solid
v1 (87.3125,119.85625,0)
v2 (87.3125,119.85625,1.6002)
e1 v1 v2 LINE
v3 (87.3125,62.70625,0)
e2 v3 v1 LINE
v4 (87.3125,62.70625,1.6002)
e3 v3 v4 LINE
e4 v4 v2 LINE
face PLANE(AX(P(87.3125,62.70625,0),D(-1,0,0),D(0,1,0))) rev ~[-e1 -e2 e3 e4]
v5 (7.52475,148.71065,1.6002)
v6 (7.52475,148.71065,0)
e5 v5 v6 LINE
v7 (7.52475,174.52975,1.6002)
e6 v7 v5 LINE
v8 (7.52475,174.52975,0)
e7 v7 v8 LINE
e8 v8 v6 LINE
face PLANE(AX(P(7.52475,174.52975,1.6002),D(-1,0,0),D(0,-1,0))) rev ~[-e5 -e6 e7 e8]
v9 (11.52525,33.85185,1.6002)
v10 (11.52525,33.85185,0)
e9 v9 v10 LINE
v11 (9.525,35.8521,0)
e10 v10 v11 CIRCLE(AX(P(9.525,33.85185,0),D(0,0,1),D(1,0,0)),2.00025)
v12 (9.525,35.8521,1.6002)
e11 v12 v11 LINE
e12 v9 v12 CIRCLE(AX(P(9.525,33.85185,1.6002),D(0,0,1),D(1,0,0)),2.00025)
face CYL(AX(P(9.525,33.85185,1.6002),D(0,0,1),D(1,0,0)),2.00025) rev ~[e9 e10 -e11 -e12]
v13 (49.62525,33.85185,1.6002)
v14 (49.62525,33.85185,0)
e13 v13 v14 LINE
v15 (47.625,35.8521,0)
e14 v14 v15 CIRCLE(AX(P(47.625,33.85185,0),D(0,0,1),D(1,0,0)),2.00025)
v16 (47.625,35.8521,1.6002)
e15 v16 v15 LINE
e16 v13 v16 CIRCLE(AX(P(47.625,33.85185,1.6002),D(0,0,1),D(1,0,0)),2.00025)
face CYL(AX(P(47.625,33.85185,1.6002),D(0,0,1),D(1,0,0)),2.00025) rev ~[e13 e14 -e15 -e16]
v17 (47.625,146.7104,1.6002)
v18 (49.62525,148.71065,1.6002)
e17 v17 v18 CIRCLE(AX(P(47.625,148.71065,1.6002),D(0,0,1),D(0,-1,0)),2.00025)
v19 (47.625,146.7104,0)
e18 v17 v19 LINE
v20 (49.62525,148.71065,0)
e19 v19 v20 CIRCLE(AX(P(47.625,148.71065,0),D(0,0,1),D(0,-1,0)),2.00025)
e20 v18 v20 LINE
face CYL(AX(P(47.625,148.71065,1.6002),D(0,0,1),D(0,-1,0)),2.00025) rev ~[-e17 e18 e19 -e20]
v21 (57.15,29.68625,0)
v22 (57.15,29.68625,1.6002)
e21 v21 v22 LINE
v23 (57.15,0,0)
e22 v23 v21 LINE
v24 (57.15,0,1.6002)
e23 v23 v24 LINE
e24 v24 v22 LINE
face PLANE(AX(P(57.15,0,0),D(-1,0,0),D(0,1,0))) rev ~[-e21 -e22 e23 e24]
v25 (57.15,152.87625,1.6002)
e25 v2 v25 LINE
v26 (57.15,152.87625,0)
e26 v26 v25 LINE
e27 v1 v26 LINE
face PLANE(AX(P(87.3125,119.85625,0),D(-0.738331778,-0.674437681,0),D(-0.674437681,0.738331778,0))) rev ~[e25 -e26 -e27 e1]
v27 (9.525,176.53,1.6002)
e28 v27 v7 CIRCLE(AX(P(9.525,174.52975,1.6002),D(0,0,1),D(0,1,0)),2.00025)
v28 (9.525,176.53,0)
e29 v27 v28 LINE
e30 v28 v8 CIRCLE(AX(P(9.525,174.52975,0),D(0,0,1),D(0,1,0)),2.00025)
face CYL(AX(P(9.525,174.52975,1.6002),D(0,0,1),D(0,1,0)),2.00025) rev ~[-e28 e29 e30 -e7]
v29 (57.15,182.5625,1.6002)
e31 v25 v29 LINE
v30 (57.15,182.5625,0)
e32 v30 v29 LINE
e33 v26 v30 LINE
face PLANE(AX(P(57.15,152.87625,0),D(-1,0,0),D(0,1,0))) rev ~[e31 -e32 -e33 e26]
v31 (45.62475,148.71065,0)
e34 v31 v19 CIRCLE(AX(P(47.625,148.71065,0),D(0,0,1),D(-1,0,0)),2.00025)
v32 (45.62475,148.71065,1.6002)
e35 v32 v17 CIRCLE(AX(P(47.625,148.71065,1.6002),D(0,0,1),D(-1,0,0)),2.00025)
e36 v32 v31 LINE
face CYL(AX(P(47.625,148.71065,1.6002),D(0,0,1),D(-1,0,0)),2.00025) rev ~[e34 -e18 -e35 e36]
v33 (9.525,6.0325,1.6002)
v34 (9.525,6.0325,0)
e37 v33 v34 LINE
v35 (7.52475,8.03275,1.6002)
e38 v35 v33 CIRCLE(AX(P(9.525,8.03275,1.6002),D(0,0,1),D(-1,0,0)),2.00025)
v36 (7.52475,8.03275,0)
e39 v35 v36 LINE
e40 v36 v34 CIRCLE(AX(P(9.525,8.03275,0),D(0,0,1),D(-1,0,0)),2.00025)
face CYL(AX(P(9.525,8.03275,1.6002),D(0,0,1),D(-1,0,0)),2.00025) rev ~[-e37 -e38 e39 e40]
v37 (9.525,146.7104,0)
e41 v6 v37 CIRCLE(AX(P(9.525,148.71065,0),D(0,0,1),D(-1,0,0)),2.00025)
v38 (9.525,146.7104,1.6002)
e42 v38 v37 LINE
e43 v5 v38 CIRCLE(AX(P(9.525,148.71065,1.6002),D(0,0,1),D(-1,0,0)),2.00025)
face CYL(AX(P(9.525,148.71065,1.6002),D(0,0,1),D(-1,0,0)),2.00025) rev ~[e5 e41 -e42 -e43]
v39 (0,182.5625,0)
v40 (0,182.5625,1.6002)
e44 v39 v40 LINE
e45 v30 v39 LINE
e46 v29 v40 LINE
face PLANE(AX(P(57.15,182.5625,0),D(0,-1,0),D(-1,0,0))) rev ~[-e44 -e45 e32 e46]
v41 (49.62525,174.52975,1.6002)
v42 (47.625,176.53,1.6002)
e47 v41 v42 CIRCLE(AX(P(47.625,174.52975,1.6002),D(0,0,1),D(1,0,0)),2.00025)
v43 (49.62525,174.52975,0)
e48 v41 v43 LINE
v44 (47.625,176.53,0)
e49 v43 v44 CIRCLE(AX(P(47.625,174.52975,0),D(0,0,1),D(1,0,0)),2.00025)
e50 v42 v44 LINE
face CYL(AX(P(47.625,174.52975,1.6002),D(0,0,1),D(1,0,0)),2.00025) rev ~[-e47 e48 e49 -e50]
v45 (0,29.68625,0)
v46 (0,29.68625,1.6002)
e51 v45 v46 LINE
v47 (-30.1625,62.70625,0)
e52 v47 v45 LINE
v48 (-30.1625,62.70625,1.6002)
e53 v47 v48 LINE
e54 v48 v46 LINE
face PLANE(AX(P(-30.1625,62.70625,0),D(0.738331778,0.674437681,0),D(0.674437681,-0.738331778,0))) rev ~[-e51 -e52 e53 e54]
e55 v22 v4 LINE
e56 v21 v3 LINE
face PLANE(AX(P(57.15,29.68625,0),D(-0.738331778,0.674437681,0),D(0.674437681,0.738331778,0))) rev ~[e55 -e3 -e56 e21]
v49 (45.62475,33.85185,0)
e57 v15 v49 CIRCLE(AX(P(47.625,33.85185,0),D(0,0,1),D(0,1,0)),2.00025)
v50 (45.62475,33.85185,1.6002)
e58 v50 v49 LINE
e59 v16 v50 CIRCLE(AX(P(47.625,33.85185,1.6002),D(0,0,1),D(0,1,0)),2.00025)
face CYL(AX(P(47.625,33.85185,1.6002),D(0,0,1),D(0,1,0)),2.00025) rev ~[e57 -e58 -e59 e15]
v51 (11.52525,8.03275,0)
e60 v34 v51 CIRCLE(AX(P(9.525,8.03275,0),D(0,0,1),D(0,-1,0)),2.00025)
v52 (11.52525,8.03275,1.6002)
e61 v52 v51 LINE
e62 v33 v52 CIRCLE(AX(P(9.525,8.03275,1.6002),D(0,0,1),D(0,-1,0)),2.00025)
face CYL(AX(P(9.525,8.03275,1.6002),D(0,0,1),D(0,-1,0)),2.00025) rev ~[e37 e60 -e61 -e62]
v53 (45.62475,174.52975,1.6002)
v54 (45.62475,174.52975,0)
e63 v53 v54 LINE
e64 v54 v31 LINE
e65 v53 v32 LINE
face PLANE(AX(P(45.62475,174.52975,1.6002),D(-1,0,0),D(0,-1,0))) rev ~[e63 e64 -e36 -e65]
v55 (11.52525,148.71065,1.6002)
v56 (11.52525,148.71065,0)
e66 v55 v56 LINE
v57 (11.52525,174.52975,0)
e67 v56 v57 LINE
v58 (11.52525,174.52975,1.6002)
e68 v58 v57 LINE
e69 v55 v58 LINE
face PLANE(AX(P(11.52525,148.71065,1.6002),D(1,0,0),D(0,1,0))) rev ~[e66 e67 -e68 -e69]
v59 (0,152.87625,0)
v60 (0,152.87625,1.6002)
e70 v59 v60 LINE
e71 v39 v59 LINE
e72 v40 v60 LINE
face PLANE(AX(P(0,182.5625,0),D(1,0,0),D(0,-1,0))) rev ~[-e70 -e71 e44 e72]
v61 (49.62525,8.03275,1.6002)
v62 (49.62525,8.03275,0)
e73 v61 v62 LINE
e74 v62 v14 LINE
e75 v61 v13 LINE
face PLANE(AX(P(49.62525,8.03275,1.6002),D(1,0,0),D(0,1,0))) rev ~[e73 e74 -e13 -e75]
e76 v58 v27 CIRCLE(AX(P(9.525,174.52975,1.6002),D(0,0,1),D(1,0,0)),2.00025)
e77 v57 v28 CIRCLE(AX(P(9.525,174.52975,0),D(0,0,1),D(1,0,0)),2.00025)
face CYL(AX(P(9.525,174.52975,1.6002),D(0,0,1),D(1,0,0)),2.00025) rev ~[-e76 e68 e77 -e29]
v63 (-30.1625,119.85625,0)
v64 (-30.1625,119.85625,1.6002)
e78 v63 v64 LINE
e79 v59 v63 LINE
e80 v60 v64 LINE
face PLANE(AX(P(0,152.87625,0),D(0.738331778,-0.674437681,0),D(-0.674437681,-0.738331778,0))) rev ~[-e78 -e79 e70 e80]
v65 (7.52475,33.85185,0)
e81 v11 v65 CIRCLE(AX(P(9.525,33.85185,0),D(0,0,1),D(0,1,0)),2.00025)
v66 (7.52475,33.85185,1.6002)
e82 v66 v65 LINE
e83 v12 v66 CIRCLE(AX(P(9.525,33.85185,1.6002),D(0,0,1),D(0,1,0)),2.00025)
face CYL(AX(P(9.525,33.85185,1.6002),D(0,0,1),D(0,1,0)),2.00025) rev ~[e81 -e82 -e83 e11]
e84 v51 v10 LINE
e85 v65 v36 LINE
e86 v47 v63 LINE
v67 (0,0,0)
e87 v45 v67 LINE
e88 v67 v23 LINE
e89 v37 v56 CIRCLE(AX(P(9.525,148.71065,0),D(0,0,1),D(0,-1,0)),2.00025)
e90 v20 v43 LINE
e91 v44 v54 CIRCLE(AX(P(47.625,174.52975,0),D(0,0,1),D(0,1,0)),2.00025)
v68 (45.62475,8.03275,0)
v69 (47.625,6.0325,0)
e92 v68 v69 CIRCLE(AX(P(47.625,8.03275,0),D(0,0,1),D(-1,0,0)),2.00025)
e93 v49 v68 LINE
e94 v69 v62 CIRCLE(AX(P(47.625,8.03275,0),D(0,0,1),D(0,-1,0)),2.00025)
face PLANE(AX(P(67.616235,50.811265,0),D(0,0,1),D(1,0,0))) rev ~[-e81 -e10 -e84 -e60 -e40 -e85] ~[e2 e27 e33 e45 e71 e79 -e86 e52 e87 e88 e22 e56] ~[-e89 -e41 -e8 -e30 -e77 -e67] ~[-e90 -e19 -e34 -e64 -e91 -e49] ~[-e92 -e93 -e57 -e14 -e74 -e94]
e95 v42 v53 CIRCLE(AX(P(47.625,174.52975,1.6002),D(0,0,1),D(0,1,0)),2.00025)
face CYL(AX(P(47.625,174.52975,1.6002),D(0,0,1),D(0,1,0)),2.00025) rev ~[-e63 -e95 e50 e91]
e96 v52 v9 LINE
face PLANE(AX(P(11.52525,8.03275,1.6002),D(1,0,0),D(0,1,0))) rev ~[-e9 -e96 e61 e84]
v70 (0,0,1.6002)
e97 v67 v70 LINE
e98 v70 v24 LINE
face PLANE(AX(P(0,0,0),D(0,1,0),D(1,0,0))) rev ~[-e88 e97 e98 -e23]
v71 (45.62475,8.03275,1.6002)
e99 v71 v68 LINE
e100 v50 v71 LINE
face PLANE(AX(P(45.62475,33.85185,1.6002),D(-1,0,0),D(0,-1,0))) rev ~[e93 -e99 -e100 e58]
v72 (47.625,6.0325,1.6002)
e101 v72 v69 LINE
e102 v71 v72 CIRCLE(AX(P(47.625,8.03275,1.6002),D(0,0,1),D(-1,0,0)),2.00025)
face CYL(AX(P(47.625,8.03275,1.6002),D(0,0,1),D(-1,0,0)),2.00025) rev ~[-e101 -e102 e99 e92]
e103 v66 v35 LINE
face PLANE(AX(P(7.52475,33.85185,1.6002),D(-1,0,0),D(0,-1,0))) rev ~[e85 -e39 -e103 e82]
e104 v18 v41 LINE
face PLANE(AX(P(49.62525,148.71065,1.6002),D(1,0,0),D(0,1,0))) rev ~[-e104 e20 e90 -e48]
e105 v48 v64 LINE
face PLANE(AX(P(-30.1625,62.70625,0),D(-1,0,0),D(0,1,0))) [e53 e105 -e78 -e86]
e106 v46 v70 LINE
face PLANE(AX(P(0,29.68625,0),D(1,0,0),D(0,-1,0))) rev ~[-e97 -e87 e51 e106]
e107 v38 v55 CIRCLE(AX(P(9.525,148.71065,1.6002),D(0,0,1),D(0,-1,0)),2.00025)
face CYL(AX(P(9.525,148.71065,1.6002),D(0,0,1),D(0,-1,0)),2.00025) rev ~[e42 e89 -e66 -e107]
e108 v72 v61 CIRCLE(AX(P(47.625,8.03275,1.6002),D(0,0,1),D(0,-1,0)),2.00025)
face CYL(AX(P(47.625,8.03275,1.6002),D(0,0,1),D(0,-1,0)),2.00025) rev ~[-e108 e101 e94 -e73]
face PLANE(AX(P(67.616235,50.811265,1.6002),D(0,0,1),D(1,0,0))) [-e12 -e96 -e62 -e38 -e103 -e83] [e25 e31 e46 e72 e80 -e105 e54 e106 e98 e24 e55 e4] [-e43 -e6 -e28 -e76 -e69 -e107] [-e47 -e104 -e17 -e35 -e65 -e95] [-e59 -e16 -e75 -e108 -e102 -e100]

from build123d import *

# Parameters (mm, degrees)
F0_W     = 30.1625
F0_H     = 57.15
F0_W_2   = 57.15
F1_DEPTH = 1.6002
F3_DEPTH = 1.6012


with BuildPart() as f1:
    # F0 (on Top) → F1 (new body)
    with BuildSketch(Plane.XY):
        Polygon((57.15, 62.70625), (57.15, 29.68625), (87.3125, 62.70625), align=None)
        Polygon((-30.1625, 62.70625), (0, 29.68625), (0, 62.70625), align=None)
        Polygon((57.15, 152.87625), (57.15, 119.85625), (87.3125, 119.85625), align=None)
        Polygon((-30.1625, 119.85625), (0, 119.85625), (0, 152.87625), align=None)
        Polygon((0, 29.68625), (0, 0), (57.15, 0), (57.15, 29.68625), (57.15, 62.70625), (0, 62.70625), align=None)
        with Locations((-15.08125, 91.28125)):
            Rectangle(F0_W, F0_H)
        with Locations((72.23125, 91.28125)):
            Rectangle(F0_W, F0_H)
        with Locations((28.575, 91.28125)):
            Rectangle(F0_W_2, F0_H)
        Polygon((0, 152.87625), (0, 119.85625), (57.15, 119.85625), (57.15, 152.87625), (57.15, 182.5625), (0, 182.5625), align=None)
    extrude(amount=F1_DEPTH)

    # F2 (on face) → F3 (cut, through all)
    with BuildSketch(Plane.XY.offset(1.6002)):
        with BuildLine():
            ThreePointArc((11.52525, 174.52975), (10.9393903391, 175.9441403391), (9.525, 176.53))
            ThreePointArc((9.525, 176.53), (8.1106096609, 175.9441403391), (7.52475, 174.52975))
            Line((7.52475, 174.52975), (7.52475, 148.71065))
            ThreePointArc((7.52475, 148.71065), (8.1106096609, 147.2962596609), (9.525, 146.7104))
            ThreePointArc((9.525, 146.7104), (10.9393903391, 147.2962596609), (11.52525, 148.71065))
            Line((11.52525, 148.71065), (11.52525, 174.52975))
        make_face()
        with BuildLine():
            ThreePointArc((49.62525, 174.52975), (49.0393903391, 175.9441403391), (47.625, 176.53))
            ThreePointArc((47.625, 176.53), (46.2106096609, 175.9441403391), (45.62475, 174.52975))
            Line((45.62475, 174.52975), (45.62475, 148.71065))
            ThreePointArc((45.62475, 148.71065), (46.2106096609, 147.2962596609), (47.625, 146.7104))
            ThreePointArc((47.625, 146.7104), (49.0393903391, 147.2962596609), (49.62525, 148.71065))
            Line((49.62525, 148.71065), (49.62525, 174.52975))
        make_face()
        with BuildLine():
            ThreePointArc((7.52475, 8.03275), (8.1106096609, 6.6183596609), (9.525, 6.0325))
            ThreePointArc((9.525, 6.0325), (10.9393903391, 6.6183596609), (11.52525, 8.03275))
            Line((11.52525, 8.03275), (11.52525, 33.85185))
            ThreePointArc((11.52525, 33.85185), (10.9393903391, 35.2662403391), (9.525, 35.8521))
            ThreePointArc((9.525, 35.8521), (8.1106096609, 35.2662403391), (7.52475, 33.85185))
            Line((7.52475, 33.85185), (7.52475, 8.03275))
        make_face()
        with BuildLine():
            ThreePointArc((45.62475, 8.03275), (46.2106096609, 6.6183596609), (47.625, 6.0325))
            ThreePointArc((47.625, 6.0325), (49.0393903391, 6.6183596609), (49.62525, 8.03275))
            Line((49.62525, 8.03275), (49.62525, 33.85185))
            ThreePointArc((49.62525, 33.85185), (49.0393903391, 35.2662403391), (47.625, 35.8521))
            ThreePointArc((47.625, 35.8521), (46.2106096609, 35.2662403391), (45.62475, 33.85185))
            Line((45.62475, 33.85185), (45.62475, 8.03275))
        make_face()
    extrude(amount=-F3_DEPTH, mode=Mode.SUBTRACT)


solid = f1.part
